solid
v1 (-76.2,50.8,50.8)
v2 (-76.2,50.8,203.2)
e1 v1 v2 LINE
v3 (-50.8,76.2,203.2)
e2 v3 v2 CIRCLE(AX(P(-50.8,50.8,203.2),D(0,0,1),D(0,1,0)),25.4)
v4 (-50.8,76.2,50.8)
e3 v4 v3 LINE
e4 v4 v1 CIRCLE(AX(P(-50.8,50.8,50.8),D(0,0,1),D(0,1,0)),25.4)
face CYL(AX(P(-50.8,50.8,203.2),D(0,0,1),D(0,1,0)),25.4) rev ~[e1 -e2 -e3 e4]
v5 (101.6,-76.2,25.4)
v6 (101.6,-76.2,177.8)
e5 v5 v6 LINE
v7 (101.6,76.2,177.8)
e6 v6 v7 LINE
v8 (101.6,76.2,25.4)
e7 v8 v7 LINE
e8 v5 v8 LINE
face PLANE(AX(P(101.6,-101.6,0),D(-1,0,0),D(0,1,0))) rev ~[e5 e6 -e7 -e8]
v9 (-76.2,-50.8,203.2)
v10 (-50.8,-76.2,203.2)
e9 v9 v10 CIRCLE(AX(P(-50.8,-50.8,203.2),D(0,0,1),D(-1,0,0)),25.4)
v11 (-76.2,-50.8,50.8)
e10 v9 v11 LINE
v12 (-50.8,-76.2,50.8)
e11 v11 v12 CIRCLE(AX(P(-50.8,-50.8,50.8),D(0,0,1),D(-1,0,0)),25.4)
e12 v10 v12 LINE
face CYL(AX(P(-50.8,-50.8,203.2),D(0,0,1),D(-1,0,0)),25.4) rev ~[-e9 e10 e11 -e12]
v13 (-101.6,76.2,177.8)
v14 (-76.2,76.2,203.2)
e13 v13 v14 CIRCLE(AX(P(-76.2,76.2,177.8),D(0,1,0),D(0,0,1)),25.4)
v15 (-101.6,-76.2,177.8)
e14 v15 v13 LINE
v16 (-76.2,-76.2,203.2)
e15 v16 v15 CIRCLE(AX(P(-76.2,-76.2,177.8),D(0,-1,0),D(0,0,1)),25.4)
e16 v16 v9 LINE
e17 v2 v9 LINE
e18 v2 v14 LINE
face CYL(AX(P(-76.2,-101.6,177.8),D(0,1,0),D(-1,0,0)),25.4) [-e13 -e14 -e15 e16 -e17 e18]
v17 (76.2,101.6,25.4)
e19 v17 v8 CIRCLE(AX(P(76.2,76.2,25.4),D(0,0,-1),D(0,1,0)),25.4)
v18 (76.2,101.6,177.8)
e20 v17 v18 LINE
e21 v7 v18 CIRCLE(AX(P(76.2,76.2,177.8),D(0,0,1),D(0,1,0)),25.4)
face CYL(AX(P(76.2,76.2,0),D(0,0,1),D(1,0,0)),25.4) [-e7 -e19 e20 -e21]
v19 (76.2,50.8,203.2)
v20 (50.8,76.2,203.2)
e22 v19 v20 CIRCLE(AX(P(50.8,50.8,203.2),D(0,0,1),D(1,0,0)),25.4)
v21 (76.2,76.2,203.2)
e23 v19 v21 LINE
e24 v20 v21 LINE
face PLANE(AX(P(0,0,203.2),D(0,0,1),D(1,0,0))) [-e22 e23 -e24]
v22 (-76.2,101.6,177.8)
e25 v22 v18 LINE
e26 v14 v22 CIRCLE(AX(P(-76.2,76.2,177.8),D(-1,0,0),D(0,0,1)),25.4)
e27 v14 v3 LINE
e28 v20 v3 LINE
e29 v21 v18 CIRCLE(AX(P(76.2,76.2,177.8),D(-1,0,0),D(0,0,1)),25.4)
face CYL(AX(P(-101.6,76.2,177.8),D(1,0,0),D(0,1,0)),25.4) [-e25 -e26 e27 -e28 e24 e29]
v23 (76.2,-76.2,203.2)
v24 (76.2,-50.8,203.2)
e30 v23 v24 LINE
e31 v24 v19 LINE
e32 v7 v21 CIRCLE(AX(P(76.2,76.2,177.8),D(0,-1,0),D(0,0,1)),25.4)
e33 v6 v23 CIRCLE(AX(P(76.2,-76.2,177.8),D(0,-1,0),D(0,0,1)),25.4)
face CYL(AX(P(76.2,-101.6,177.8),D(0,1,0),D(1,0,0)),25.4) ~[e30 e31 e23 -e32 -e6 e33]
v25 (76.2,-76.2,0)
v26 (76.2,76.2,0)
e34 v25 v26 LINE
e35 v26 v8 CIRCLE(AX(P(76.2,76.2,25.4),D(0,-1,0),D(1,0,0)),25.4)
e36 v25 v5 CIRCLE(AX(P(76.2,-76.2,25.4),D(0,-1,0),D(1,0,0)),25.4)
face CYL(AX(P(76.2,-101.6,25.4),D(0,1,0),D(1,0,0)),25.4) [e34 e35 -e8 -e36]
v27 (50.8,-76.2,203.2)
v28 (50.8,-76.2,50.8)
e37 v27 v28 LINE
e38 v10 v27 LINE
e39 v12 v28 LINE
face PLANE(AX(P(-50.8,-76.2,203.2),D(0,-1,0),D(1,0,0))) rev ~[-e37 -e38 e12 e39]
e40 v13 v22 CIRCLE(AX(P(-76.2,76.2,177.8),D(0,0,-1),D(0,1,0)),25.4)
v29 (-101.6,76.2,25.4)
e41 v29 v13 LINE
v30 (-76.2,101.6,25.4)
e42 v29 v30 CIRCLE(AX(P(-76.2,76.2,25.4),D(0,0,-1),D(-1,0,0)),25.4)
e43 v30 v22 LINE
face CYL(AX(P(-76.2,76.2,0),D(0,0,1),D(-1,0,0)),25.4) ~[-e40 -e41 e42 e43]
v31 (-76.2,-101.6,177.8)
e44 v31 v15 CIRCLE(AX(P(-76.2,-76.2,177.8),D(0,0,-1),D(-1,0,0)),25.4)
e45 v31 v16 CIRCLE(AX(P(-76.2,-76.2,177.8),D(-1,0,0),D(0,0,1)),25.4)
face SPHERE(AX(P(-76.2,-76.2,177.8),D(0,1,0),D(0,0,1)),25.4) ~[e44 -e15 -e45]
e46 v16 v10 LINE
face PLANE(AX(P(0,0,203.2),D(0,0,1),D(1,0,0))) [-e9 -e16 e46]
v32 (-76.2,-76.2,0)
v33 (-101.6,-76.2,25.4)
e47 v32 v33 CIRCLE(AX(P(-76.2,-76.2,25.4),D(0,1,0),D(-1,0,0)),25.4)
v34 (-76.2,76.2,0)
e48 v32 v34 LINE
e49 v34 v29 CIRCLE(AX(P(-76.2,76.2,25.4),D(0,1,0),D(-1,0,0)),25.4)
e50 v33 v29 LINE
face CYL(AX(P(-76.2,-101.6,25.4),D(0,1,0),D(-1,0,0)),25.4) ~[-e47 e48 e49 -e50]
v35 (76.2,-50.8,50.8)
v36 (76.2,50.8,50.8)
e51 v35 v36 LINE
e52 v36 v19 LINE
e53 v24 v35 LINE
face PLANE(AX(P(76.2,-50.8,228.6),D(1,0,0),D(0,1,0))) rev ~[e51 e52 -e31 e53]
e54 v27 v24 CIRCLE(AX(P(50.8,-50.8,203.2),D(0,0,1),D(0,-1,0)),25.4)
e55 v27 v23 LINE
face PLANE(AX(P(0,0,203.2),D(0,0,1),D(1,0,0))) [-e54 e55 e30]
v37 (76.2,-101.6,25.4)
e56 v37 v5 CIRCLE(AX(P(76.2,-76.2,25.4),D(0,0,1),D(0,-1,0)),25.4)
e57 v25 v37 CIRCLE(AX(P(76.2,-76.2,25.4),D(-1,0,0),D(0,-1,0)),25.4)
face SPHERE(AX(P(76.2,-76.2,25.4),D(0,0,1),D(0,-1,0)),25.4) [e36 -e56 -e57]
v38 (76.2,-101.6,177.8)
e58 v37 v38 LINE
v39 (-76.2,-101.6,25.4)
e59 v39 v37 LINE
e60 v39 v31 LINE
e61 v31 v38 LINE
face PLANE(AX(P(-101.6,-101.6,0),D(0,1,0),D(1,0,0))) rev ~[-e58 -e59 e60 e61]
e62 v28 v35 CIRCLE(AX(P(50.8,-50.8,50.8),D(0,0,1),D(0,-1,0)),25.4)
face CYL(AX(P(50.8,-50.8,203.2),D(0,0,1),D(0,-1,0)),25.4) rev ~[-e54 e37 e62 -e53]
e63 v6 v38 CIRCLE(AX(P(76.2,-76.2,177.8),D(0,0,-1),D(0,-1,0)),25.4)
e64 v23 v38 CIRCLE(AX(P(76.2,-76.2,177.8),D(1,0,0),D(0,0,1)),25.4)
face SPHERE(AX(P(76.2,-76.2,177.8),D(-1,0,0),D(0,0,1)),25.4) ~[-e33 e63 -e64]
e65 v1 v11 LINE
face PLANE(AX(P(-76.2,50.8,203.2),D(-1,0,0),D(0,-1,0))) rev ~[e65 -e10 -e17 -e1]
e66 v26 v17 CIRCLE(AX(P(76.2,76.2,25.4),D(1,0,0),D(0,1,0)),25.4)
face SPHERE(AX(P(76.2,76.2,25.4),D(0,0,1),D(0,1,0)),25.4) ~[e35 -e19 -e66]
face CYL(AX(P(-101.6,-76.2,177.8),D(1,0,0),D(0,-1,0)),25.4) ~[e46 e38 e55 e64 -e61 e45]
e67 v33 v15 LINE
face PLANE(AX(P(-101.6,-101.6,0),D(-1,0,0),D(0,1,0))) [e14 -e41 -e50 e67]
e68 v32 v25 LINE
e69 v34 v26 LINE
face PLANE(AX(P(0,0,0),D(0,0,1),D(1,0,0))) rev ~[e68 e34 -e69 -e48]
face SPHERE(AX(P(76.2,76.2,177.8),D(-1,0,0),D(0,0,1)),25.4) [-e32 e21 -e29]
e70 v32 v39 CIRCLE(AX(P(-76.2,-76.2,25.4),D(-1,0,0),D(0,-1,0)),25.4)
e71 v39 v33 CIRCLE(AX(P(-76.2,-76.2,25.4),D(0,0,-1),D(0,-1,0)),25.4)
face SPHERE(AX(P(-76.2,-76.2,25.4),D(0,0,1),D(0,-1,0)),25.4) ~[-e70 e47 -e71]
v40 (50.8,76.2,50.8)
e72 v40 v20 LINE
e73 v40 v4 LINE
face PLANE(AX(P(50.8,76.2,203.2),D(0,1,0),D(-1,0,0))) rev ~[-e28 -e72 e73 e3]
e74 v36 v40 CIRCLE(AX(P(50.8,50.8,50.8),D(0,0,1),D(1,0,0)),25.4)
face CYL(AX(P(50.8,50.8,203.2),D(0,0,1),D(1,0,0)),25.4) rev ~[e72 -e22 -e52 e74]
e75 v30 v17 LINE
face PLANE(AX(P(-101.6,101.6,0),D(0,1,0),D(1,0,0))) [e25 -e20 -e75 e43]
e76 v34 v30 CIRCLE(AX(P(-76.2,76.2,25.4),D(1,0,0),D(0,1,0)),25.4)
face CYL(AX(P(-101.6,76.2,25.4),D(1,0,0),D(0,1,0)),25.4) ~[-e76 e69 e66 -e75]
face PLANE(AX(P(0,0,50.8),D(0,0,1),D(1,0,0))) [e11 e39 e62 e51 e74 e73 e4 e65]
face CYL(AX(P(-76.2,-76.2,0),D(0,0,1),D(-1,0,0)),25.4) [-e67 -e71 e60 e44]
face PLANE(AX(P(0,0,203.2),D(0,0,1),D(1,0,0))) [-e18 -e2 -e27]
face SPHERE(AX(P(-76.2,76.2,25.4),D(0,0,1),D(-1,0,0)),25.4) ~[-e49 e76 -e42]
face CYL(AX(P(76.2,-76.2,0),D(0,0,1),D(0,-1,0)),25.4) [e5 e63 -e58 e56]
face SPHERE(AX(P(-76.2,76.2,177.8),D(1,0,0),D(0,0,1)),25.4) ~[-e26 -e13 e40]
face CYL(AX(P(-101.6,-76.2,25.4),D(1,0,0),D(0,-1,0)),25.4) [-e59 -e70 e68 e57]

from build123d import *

# Parameters (mm, degrees)
F0_W      = 203.2
F0_H      = 203.2
F1_DEPTH  = 203.2
F2_R      = 25.4
F3_W      = 50.8
F3_H      = 50.8
F4_DEPTH  = 12.7
F5_W      = 50.8
F5_H      = 50.8
F6_DEPTH  = 12.7
F12_DEPTH = 177.8


# Not quite as in the source:
# - a feature of the source that left no trace in its solid (it failed there, or was rolled back) is left out


with BuildPart() as f1:
    # F0 (on Top) → F1 (new body)
    with BuildSketch(Plane.XY):
        Rectangle(F0_W, F0_H)
    extrude(amount=F1_DEPTH)

    # F2
    f2_edges = [f1.edges().sort_by_distance(p)[0] for p in [
        (0, 101.6, 203.2),
        (-101.6, 0, 203.2),
        (0, -101.6, 203.2),
        (101.6, 0, 203.2),
        (-101.6, -101.6, 101.6),
        (101.6, -101.6, 101.6),
        (0, -101.6, 0),
        (-101.6, 101.6, 101.6),
        (-101.6, 0, 0),
        (101.6, 101.6, 101.6),
        (0, 101.6, 0),
        (101.6, 0, 0),
    ]]
    fillet(f2_edges, radius=F2_R)

    # F3 (on face) → F4 (cut)
    with BuildSketch(Plane.XY.offset(203.2)):
        with BuildLine():
            Line((50.8, 76.2), (-50.8, 76.2))
            ThreePointArc((-50.8, 76.2), (-68.7605122421, 68.7605122421), (-76.2, 50.8))
            Line((-76.2, 50.8), (-76.2, -50.8))
            ThreePointArc((-76.2, -50.8), (-68.7605122421, -68.7605122421), (-50.8, -76.2))
            Line((-50.8, -76.2), (50.8, -76.2))
            ThreePointArc((50.8, -76.2), (68.7605122421, -68.7605122421), (76.2, -50.8))
            Line((76.2, -50.8), (76.2, 50.8))
            ThreePointArc((76.2, 50.8), (68.7605122421, 68.7605122421), (50.8, 76.2))
        make_face()
        Rectangle(F3_W, F3_H, mode=Mode.SUBTRACT)
    extrude(amount=-F4_DEPTH, mode=Mode.SUBTRACT)

    # F5 (on face) → F6 (cut)
    with BuildSketch(Plane.XY.offset(203.2)):
        with BuildLine():
            Line((-25.4, 25.4), (25.4, 25.4))
            ThreePointArc((25.4, 25.4), (0, 35.9210244843), (-25.4, 25.4))
        make_face()
        with BuildLine():
            Line((-25.4, -25.4), (-25.4, 25.4))
            ThreePointArc((-25.4, 25.4), (-35.9210244843, 0), (-25.4, -25.4))
        make_face()
        with BuildLine():
            ThreePointArc((-25.4, -25.4), (0, -35.9210244843), (25.4, -25.4))
            Line((25.4, -25.4), (-25.4, -25.4))
        make_face()
        Rectangle(F5_W, F5_H)
        with BuildLine():
            ThreePointArc((25.4, -25.4), (33.1866993079, -13.7463809437), (35.9210244843, 0))
            ThreePointArc((35.9210244843, 0), (33.1866993079, 13.7463809437), (25.4, 25.4))
            Line((25.4, 25.4), (25.4, -25.4))
        make_face()
    extrude(amount=-F6_DEPTH, mode=Mode.SUBTRACT)

    # F11 (on offset) → F12 (cut)
    with BuildSketch(Plane.XY.offset(228.6)):
        with BuildLine():
            Line((50.8, 76.2), (-50.8, 76.2))
            ThreePointArc((-50.8, 76.2), (-68.7605122421, 68.7605122421), (-76.2, 50.8))
            Line((-76.2, 50.8), (-76.2, -50.8))
            ThreePointArc((-76.2, -50.8), (-68.7605122421, -68.7605122421), (-50.8, -76.2))
            Line((-50.8, -76.2), (50.8, -76.2))
            ThreePointArc((50.8, -76.2), (68.7605122421, -68.7605122421), (76.2, -50.8))
            Line((76.2, -50.8), (76.2, 50.8))
            ThreePointArc((76.2, 50.8), (68.7605122421, 68.7605122421), (50.8, 76.2))
        make_face()
    extrude(amount=-F12_DEPTH, mode=Mode.SUBTRACT)


solid = f1.part
